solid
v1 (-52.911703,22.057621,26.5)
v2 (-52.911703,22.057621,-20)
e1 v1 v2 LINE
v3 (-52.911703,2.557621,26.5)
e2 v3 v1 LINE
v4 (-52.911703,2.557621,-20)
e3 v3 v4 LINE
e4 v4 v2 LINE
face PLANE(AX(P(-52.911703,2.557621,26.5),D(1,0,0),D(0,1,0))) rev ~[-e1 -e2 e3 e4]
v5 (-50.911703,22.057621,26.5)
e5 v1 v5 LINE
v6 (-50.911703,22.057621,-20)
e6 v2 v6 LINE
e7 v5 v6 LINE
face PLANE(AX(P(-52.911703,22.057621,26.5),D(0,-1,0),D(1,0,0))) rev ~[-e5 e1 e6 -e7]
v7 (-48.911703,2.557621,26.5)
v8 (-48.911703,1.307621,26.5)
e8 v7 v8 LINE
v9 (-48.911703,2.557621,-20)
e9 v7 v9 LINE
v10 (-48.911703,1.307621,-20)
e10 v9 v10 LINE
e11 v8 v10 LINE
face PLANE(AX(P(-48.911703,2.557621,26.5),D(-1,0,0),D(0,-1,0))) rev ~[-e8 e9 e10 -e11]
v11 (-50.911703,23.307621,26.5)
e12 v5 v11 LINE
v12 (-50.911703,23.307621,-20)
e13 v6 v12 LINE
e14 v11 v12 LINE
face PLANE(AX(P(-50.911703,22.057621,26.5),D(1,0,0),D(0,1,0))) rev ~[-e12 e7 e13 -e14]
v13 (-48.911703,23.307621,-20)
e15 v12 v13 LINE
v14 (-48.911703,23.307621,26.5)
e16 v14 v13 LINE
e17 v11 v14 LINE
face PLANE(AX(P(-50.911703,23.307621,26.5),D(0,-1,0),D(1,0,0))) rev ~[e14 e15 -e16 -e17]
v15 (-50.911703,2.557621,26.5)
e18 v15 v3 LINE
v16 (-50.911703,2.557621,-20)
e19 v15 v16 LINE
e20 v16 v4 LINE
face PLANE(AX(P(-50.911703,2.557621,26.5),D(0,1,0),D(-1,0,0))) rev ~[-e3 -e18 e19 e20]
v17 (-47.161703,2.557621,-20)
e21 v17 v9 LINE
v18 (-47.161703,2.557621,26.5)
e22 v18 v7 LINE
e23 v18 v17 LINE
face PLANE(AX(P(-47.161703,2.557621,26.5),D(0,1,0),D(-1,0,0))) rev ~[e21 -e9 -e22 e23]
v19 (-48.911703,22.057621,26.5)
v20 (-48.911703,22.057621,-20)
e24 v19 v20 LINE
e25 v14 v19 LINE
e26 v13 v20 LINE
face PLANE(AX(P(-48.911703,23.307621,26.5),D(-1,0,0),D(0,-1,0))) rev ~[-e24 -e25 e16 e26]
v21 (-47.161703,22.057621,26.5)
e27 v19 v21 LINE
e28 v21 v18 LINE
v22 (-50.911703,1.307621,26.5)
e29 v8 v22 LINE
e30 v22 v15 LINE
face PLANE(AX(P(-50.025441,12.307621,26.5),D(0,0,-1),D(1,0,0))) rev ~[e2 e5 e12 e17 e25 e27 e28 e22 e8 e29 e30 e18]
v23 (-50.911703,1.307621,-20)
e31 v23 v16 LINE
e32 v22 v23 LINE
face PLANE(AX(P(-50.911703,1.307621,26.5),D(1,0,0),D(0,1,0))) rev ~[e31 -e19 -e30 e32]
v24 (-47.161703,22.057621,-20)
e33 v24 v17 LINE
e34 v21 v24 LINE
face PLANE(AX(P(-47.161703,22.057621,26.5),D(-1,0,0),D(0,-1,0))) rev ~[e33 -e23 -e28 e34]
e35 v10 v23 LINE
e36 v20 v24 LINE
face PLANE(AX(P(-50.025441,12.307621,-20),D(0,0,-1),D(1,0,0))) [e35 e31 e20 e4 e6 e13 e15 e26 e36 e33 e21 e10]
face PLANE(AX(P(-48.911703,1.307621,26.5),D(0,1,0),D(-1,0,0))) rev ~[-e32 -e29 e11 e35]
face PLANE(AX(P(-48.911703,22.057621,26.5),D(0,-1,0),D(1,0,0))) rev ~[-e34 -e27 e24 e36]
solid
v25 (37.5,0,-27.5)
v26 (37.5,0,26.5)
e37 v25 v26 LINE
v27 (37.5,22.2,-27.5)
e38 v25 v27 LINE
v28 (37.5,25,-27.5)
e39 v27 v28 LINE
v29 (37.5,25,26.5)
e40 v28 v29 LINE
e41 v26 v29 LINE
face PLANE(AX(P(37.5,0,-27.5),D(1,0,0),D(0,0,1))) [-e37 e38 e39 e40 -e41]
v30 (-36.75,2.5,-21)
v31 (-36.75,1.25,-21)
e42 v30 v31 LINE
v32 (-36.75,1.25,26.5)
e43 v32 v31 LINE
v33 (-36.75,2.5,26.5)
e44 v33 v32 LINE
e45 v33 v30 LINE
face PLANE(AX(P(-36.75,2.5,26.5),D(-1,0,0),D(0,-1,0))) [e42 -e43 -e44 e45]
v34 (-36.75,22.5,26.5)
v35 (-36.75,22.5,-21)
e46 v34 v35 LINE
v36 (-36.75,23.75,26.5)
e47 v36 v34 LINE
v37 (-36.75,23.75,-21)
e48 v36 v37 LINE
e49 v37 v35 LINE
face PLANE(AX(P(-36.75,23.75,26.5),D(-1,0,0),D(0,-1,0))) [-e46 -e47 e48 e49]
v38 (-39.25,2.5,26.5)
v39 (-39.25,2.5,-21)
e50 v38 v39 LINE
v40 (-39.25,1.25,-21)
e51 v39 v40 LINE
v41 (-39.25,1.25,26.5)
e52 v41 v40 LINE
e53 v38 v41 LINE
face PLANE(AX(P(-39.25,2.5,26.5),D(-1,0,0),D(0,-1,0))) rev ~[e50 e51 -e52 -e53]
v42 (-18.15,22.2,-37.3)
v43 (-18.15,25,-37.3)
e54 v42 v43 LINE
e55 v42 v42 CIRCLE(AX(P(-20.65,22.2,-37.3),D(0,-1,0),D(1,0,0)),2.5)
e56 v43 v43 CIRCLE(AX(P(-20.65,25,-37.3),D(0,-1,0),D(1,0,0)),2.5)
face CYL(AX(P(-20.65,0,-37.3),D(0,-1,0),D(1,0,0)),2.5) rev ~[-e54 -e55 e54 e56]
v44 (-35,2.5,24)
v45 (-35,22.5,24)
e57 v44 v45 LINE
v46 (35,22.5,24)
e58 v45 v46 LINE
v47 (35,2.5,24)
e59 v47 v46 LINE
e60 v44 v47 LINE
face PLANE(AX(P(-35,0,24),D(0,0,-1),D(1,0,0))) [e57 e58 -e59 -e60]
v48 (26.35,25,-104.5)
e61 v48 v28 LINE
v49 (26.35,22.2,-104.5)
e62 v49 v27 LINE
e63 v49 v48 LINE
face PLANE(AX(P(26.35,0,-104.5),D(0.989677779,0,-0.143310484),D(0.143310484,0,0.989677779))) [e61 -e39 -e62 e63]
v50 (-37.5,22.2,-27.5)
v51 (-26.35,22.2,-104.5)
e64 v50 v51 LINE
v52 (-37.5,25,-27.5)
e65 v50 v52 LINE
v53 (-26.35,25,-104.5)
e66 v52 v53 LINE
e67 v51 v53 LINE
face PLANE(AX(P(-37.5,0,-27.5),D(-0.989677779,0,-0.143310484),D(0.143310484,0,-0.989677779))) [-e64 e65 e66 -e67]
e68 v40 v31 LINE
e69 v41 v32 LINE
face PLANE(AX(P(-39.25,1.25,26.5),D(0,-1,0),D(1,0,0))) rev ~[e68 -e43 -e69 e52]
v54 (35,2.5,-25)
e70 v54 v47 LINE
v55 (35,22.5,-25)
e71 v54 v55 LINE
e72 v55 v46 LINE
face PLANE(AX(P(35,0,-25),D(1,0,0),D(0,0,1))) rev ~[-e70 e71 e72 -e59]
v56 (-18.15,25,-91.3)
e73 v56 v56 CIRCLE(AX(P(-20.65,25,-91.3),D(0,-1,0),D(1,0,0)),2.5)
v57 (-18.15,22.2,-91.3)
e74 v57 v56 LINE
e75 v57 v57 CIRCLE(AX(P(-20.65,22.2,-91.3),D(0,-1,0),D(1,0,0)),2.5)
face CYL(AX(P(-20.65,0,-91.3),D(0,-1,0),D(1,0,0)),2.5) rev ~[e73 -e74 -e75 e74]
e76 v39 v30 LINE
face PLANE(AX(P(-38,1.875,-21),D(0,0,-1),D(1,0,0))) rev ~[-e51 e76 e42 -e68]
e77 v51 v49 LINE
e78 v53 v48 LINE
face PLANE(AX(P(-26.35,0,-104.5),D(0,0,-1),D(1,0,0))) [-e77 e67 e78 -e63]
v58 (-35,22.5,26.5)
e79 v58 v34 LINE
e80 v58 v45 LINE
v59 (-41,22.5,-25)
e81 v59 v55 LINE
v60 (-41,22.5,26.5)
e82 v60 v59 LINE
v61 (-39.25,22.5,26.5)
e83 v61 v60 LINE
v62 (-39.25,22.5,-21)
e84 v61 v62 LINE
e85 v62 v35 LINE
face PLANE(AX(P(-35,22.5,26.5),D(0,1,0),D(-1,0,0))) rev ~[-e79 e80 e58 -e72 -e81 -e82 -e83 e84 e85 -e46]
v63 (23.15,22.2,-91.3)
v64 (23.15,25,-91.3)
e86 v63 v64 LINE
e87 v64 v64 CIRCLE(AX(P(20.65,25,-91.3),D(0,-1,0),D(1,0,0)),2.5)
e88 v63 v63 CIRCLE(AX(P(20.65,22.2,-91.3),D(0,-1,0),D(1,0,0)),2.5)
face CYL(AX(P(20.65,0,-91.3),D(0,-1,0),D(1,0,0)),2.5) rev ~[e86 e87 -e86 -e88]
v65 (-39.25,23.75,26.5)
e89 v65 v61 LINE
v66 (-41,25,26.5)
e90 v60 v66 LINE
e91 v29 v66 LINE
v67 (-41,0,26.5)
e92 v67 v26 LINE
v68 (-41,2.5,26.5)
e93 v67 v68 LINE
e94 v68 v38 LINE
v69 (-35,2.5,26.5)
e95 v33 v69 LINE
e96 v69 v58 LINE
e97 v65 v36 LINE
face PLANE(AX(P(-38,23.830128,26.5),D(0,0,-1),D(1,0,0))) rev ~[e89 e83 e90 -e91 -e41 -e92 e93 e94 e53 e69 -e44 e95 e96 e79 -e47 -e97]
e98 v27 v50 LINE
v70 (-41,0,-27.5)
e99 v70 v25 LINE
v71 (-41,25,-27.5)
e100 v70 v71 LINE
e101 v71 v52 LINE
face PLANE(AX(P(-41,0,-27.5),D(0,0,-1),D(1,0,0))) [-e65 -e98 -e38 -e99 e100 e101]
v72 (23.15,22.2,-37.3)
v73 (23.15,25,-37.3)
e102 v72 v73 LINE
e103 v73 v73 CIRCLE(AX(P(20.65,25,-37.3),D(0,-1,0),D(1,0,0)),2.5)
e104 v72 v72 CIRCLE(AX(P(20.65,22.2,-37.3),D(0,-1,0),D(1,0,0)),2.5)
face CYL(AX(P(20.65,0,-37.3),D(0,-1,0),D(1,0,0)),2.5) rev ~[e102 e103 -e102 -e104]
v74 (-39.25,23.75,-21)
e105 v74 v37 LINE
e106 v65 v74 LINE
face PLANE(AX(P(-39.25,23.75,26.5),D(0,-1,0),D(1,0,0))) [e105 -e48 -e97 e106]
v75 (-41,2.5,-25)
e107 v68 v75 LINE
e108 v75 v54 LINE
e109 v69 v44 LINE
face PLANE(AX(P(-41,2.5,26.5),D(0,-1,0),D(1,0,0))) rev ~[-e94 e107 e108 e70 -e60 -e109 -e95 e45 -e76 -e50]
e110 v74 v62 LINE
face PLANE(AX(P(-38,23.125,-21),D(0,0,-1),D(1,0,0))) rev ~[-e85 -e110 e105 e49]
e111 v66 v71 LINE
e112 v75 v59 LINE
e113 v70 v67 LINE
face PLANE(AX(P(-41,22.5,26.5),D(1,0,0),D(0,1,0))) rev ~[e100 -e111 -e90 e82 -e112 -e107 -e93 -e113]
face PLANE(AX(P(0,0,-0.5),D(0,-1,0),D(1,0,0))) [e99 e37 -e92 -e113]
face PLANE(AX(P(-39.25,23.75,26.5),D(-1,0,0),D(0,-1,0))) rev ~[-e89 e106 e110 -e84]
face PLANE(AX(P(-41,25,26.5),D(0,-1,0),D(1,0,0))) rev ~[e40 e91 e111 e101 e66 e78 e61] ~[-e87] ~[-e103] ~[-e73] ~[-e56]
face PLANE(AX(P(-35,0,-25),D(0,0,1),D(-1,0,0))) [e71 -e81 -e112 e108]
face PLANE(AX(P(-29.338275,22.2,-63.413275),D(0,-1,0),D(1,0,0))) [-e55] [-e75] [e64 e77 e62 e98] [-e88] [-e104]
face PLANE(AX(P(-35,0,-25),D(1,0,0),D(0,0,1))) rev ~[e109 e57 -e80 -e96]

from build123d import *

# Parameters (mm, degrees)
F0_W      = 70
F0_H      = 49
F0_W_2    = 26.35
F0_H_2    = 0.8
F0_R      = 2.5
F0_W_3    = 3.5
F0_H_3    = 2.5
F0_W_4    = 2.5
F1_DEPTH  = 25
F2_DEPTH  = 22.5
F3_DEPTH  = 2.5
F6_W      = 2.5
F6_H      = 1.25
F7_DEPTH  = 51.5
F8_DEPTH  = 47.5
F9_DEPTH  = 46.5
F10_DEPTH = 22.2


# Not quite as in the source:
# - a feature names something its author has since deleted; it is built from what else it names


with BuildPart() as f1:
    # F0 (on Front) → F1 (new body)
    with BuildSketch(Plane.XZ):
        Polygon((-35, 24), (35, 24), (35, -25), (-35, -25), (-35, -27.5), (-26.35, -27.5), (0, -27.5), (26.35, -27.5), (37.5, -27.5), (37.5, 26.5), (-35, 26.5), align=None)
        with Locations((0, -0.5)):
            Rectangle(F0_W, F0_H)
        Polygon((26.35, -104.5), (37.5, -27.5), (26.35, -27.5), (26.35, -28.3), align=None)
        with Locations((-13.175, -27.9)):
            Rectangle(F0_W_2, F0_H_2)
        with Locations((13.175, -27.9)):
            Rectangle(F0_W_2, F0_H_2)
        Polygon((0, -28.3), (-26.35, -28.3), (-26.35, -104.5), (26.35, -104.5), (26.35, -28.3), align=None)
        with Locations((-20.65, -91.3)):
            Circle(F0_R, mode=Mode.SUBTRACT)
        with Locations((20.65, -91.3)):
            Circle(F0_R, mode=Mode.SUBTRACT)
        with Locations((-20.65, -37.3)):
            Circle(F0_R, mode=Mode.SUBTRACT)
        with Locations((20.65, -37.3)):
            Circle(F0_R, mode=Mode.SUBTRACT)
        Polygon((-26.35, -27.5), (-35, -27.5), (-37.5, -27.5), (-26.35, -104.5), (-26.35, -28.3), align=None)
        with Locations((-39.25, -26.25)):
            Rectangle(F0_W_3, F0_H_3)
        with Locations((-36.25, -26.25)):
            Rectangle(F0_W_4, F0_H_3)
    extrude(amount=-F1_DEPTH)

    # F0 (on Front) → F2 (cut)
    with BuildSketch(Plane.XZ):
        with Locations((0, -0.5)):
            Rectangle(F0_W, F0_H)
    extrude(amount=-F2_DEPTH, mode=Mode.SUBTRACT)

    # F0 (on Front) → F3 (join)
    with BuildSketch(Plane.XZ):
        with Locations((0, -0.5)):
            Rectangle(F0_W, F0_H)
    extrude(amount=-F3_DEPTH)

    # F6 (on 3pt) → F7 (join)
    with BuildSketch(Plane(origin=(0, 0, 26.5), x_dir=(1, 0, 0), z_dir=(0, 0, -1))):
        Polygon((-35, -25), (-35, -22.5), (-36.75, -22.5), (-36.75, -23.75), (-39.25, -23.75), (-39.25, -22.5), (-41, -22.5), (-41, -25), align=None)
        Polygon((-35, -2.5), (-35, 0), (-41, 0), (-41, -2.5), (-39.25, -2.5), (-39.25, -1.25), (-36.75, -1.25), (-36.75, -2.5), align=None)
        with Locations((-38, -1.875)):
            Rectangle(F6_W, F6_H)
        with Locations((-38, -23.125)):
            Rectangle(F6_W, F6_H)
    extrude(amount=F7_DEPTH)

    # F6 (on 3pt) → F8 (cut)
    with BuildSketch(Plane(origin=(0, 0, 26.5), x_dir=(1, 0, 0), z_dir=(0, 0, -1))):
        with Locations((-38, -23.125)):
            Rectangle(F6_W, F6_H)
        with Locations((-38, -1.875)):
            Rectangle(F6_W, F6_H)
    extrude(amount=F8_DEPTH, mode=Mode.SUBTRACT)

    # F0 (on Front) → F10 (cut)
    with BuildSketch(Plane.XZ):
        Polygon((-26.35, -27.5), (-35, -27.5), (-37.5, -27.5), (-26.35, -104.5), (-26.35, -28.3), align=None)
        Polygon((0, -28.3), (-26.35, -28.3), (-26.35, -104.5), (26.35, -104.5), (26.35, -28.3), align=None)
        with Locations((-20.65, -91.3)):
            Circle(F0_R, mode=Mode.SUBTRACT)
        with Locations((20.65, -91.3)):
            Circle(F0_R, mode=Mode.SUBTRACT)
        with Locations((-20.65, -37.3)):
            Circle(F0_R, mode=Mode.SUBTRACT)
        with Locations((20.65, -37.3)):
            Circle(F0_R, mode=Mode.SUBTRACT)
        Polygon((26.35, -104.5), (37.5, -27.5), (26.35, -27.5), (26.35, -28.3), align=None)
        with Locations((-13.175, -27.9)):
            Rectangle(F0_W_2, F0_H_2)
        with Locations((13.175, -27.9)):
            Rectangle(F0_W_2, F0_H_2)
    extrude(amount=-F10_DEPTH, mode=Mode.SUBTRACT)


with BuildPart() as f9:
    # F6 (on 3pt) → F9 (new body)
    with BuildSketch(Plane(origin=(0, 0, 26.5), x_dir=(1, 0, 0), z_dir=(0, 0, -1))):
        Polygon((-52.9117025435, -2.5576207936), (-52.9117025435, -22.0576207936), (-50.9117025435, -22.0576207936), (-50.9117025435, -23.3076207936), (-48.9117025435, -23.3076207936), (-48.9117025435, -22.0576207936), (-47.1617025435, -22.0576207936), (-47.1617025435, -2.5576207936), (-48.9117025435, -2.5576207936), (-48.9117025435, -1.3076207936), (-50.9117025435, -1.3076207936), (-50.9117025435, -2.5576207936), align=None)
    extrude(amount=F9_DEPTH)


solid = Compound([f1.part, f9.part])
